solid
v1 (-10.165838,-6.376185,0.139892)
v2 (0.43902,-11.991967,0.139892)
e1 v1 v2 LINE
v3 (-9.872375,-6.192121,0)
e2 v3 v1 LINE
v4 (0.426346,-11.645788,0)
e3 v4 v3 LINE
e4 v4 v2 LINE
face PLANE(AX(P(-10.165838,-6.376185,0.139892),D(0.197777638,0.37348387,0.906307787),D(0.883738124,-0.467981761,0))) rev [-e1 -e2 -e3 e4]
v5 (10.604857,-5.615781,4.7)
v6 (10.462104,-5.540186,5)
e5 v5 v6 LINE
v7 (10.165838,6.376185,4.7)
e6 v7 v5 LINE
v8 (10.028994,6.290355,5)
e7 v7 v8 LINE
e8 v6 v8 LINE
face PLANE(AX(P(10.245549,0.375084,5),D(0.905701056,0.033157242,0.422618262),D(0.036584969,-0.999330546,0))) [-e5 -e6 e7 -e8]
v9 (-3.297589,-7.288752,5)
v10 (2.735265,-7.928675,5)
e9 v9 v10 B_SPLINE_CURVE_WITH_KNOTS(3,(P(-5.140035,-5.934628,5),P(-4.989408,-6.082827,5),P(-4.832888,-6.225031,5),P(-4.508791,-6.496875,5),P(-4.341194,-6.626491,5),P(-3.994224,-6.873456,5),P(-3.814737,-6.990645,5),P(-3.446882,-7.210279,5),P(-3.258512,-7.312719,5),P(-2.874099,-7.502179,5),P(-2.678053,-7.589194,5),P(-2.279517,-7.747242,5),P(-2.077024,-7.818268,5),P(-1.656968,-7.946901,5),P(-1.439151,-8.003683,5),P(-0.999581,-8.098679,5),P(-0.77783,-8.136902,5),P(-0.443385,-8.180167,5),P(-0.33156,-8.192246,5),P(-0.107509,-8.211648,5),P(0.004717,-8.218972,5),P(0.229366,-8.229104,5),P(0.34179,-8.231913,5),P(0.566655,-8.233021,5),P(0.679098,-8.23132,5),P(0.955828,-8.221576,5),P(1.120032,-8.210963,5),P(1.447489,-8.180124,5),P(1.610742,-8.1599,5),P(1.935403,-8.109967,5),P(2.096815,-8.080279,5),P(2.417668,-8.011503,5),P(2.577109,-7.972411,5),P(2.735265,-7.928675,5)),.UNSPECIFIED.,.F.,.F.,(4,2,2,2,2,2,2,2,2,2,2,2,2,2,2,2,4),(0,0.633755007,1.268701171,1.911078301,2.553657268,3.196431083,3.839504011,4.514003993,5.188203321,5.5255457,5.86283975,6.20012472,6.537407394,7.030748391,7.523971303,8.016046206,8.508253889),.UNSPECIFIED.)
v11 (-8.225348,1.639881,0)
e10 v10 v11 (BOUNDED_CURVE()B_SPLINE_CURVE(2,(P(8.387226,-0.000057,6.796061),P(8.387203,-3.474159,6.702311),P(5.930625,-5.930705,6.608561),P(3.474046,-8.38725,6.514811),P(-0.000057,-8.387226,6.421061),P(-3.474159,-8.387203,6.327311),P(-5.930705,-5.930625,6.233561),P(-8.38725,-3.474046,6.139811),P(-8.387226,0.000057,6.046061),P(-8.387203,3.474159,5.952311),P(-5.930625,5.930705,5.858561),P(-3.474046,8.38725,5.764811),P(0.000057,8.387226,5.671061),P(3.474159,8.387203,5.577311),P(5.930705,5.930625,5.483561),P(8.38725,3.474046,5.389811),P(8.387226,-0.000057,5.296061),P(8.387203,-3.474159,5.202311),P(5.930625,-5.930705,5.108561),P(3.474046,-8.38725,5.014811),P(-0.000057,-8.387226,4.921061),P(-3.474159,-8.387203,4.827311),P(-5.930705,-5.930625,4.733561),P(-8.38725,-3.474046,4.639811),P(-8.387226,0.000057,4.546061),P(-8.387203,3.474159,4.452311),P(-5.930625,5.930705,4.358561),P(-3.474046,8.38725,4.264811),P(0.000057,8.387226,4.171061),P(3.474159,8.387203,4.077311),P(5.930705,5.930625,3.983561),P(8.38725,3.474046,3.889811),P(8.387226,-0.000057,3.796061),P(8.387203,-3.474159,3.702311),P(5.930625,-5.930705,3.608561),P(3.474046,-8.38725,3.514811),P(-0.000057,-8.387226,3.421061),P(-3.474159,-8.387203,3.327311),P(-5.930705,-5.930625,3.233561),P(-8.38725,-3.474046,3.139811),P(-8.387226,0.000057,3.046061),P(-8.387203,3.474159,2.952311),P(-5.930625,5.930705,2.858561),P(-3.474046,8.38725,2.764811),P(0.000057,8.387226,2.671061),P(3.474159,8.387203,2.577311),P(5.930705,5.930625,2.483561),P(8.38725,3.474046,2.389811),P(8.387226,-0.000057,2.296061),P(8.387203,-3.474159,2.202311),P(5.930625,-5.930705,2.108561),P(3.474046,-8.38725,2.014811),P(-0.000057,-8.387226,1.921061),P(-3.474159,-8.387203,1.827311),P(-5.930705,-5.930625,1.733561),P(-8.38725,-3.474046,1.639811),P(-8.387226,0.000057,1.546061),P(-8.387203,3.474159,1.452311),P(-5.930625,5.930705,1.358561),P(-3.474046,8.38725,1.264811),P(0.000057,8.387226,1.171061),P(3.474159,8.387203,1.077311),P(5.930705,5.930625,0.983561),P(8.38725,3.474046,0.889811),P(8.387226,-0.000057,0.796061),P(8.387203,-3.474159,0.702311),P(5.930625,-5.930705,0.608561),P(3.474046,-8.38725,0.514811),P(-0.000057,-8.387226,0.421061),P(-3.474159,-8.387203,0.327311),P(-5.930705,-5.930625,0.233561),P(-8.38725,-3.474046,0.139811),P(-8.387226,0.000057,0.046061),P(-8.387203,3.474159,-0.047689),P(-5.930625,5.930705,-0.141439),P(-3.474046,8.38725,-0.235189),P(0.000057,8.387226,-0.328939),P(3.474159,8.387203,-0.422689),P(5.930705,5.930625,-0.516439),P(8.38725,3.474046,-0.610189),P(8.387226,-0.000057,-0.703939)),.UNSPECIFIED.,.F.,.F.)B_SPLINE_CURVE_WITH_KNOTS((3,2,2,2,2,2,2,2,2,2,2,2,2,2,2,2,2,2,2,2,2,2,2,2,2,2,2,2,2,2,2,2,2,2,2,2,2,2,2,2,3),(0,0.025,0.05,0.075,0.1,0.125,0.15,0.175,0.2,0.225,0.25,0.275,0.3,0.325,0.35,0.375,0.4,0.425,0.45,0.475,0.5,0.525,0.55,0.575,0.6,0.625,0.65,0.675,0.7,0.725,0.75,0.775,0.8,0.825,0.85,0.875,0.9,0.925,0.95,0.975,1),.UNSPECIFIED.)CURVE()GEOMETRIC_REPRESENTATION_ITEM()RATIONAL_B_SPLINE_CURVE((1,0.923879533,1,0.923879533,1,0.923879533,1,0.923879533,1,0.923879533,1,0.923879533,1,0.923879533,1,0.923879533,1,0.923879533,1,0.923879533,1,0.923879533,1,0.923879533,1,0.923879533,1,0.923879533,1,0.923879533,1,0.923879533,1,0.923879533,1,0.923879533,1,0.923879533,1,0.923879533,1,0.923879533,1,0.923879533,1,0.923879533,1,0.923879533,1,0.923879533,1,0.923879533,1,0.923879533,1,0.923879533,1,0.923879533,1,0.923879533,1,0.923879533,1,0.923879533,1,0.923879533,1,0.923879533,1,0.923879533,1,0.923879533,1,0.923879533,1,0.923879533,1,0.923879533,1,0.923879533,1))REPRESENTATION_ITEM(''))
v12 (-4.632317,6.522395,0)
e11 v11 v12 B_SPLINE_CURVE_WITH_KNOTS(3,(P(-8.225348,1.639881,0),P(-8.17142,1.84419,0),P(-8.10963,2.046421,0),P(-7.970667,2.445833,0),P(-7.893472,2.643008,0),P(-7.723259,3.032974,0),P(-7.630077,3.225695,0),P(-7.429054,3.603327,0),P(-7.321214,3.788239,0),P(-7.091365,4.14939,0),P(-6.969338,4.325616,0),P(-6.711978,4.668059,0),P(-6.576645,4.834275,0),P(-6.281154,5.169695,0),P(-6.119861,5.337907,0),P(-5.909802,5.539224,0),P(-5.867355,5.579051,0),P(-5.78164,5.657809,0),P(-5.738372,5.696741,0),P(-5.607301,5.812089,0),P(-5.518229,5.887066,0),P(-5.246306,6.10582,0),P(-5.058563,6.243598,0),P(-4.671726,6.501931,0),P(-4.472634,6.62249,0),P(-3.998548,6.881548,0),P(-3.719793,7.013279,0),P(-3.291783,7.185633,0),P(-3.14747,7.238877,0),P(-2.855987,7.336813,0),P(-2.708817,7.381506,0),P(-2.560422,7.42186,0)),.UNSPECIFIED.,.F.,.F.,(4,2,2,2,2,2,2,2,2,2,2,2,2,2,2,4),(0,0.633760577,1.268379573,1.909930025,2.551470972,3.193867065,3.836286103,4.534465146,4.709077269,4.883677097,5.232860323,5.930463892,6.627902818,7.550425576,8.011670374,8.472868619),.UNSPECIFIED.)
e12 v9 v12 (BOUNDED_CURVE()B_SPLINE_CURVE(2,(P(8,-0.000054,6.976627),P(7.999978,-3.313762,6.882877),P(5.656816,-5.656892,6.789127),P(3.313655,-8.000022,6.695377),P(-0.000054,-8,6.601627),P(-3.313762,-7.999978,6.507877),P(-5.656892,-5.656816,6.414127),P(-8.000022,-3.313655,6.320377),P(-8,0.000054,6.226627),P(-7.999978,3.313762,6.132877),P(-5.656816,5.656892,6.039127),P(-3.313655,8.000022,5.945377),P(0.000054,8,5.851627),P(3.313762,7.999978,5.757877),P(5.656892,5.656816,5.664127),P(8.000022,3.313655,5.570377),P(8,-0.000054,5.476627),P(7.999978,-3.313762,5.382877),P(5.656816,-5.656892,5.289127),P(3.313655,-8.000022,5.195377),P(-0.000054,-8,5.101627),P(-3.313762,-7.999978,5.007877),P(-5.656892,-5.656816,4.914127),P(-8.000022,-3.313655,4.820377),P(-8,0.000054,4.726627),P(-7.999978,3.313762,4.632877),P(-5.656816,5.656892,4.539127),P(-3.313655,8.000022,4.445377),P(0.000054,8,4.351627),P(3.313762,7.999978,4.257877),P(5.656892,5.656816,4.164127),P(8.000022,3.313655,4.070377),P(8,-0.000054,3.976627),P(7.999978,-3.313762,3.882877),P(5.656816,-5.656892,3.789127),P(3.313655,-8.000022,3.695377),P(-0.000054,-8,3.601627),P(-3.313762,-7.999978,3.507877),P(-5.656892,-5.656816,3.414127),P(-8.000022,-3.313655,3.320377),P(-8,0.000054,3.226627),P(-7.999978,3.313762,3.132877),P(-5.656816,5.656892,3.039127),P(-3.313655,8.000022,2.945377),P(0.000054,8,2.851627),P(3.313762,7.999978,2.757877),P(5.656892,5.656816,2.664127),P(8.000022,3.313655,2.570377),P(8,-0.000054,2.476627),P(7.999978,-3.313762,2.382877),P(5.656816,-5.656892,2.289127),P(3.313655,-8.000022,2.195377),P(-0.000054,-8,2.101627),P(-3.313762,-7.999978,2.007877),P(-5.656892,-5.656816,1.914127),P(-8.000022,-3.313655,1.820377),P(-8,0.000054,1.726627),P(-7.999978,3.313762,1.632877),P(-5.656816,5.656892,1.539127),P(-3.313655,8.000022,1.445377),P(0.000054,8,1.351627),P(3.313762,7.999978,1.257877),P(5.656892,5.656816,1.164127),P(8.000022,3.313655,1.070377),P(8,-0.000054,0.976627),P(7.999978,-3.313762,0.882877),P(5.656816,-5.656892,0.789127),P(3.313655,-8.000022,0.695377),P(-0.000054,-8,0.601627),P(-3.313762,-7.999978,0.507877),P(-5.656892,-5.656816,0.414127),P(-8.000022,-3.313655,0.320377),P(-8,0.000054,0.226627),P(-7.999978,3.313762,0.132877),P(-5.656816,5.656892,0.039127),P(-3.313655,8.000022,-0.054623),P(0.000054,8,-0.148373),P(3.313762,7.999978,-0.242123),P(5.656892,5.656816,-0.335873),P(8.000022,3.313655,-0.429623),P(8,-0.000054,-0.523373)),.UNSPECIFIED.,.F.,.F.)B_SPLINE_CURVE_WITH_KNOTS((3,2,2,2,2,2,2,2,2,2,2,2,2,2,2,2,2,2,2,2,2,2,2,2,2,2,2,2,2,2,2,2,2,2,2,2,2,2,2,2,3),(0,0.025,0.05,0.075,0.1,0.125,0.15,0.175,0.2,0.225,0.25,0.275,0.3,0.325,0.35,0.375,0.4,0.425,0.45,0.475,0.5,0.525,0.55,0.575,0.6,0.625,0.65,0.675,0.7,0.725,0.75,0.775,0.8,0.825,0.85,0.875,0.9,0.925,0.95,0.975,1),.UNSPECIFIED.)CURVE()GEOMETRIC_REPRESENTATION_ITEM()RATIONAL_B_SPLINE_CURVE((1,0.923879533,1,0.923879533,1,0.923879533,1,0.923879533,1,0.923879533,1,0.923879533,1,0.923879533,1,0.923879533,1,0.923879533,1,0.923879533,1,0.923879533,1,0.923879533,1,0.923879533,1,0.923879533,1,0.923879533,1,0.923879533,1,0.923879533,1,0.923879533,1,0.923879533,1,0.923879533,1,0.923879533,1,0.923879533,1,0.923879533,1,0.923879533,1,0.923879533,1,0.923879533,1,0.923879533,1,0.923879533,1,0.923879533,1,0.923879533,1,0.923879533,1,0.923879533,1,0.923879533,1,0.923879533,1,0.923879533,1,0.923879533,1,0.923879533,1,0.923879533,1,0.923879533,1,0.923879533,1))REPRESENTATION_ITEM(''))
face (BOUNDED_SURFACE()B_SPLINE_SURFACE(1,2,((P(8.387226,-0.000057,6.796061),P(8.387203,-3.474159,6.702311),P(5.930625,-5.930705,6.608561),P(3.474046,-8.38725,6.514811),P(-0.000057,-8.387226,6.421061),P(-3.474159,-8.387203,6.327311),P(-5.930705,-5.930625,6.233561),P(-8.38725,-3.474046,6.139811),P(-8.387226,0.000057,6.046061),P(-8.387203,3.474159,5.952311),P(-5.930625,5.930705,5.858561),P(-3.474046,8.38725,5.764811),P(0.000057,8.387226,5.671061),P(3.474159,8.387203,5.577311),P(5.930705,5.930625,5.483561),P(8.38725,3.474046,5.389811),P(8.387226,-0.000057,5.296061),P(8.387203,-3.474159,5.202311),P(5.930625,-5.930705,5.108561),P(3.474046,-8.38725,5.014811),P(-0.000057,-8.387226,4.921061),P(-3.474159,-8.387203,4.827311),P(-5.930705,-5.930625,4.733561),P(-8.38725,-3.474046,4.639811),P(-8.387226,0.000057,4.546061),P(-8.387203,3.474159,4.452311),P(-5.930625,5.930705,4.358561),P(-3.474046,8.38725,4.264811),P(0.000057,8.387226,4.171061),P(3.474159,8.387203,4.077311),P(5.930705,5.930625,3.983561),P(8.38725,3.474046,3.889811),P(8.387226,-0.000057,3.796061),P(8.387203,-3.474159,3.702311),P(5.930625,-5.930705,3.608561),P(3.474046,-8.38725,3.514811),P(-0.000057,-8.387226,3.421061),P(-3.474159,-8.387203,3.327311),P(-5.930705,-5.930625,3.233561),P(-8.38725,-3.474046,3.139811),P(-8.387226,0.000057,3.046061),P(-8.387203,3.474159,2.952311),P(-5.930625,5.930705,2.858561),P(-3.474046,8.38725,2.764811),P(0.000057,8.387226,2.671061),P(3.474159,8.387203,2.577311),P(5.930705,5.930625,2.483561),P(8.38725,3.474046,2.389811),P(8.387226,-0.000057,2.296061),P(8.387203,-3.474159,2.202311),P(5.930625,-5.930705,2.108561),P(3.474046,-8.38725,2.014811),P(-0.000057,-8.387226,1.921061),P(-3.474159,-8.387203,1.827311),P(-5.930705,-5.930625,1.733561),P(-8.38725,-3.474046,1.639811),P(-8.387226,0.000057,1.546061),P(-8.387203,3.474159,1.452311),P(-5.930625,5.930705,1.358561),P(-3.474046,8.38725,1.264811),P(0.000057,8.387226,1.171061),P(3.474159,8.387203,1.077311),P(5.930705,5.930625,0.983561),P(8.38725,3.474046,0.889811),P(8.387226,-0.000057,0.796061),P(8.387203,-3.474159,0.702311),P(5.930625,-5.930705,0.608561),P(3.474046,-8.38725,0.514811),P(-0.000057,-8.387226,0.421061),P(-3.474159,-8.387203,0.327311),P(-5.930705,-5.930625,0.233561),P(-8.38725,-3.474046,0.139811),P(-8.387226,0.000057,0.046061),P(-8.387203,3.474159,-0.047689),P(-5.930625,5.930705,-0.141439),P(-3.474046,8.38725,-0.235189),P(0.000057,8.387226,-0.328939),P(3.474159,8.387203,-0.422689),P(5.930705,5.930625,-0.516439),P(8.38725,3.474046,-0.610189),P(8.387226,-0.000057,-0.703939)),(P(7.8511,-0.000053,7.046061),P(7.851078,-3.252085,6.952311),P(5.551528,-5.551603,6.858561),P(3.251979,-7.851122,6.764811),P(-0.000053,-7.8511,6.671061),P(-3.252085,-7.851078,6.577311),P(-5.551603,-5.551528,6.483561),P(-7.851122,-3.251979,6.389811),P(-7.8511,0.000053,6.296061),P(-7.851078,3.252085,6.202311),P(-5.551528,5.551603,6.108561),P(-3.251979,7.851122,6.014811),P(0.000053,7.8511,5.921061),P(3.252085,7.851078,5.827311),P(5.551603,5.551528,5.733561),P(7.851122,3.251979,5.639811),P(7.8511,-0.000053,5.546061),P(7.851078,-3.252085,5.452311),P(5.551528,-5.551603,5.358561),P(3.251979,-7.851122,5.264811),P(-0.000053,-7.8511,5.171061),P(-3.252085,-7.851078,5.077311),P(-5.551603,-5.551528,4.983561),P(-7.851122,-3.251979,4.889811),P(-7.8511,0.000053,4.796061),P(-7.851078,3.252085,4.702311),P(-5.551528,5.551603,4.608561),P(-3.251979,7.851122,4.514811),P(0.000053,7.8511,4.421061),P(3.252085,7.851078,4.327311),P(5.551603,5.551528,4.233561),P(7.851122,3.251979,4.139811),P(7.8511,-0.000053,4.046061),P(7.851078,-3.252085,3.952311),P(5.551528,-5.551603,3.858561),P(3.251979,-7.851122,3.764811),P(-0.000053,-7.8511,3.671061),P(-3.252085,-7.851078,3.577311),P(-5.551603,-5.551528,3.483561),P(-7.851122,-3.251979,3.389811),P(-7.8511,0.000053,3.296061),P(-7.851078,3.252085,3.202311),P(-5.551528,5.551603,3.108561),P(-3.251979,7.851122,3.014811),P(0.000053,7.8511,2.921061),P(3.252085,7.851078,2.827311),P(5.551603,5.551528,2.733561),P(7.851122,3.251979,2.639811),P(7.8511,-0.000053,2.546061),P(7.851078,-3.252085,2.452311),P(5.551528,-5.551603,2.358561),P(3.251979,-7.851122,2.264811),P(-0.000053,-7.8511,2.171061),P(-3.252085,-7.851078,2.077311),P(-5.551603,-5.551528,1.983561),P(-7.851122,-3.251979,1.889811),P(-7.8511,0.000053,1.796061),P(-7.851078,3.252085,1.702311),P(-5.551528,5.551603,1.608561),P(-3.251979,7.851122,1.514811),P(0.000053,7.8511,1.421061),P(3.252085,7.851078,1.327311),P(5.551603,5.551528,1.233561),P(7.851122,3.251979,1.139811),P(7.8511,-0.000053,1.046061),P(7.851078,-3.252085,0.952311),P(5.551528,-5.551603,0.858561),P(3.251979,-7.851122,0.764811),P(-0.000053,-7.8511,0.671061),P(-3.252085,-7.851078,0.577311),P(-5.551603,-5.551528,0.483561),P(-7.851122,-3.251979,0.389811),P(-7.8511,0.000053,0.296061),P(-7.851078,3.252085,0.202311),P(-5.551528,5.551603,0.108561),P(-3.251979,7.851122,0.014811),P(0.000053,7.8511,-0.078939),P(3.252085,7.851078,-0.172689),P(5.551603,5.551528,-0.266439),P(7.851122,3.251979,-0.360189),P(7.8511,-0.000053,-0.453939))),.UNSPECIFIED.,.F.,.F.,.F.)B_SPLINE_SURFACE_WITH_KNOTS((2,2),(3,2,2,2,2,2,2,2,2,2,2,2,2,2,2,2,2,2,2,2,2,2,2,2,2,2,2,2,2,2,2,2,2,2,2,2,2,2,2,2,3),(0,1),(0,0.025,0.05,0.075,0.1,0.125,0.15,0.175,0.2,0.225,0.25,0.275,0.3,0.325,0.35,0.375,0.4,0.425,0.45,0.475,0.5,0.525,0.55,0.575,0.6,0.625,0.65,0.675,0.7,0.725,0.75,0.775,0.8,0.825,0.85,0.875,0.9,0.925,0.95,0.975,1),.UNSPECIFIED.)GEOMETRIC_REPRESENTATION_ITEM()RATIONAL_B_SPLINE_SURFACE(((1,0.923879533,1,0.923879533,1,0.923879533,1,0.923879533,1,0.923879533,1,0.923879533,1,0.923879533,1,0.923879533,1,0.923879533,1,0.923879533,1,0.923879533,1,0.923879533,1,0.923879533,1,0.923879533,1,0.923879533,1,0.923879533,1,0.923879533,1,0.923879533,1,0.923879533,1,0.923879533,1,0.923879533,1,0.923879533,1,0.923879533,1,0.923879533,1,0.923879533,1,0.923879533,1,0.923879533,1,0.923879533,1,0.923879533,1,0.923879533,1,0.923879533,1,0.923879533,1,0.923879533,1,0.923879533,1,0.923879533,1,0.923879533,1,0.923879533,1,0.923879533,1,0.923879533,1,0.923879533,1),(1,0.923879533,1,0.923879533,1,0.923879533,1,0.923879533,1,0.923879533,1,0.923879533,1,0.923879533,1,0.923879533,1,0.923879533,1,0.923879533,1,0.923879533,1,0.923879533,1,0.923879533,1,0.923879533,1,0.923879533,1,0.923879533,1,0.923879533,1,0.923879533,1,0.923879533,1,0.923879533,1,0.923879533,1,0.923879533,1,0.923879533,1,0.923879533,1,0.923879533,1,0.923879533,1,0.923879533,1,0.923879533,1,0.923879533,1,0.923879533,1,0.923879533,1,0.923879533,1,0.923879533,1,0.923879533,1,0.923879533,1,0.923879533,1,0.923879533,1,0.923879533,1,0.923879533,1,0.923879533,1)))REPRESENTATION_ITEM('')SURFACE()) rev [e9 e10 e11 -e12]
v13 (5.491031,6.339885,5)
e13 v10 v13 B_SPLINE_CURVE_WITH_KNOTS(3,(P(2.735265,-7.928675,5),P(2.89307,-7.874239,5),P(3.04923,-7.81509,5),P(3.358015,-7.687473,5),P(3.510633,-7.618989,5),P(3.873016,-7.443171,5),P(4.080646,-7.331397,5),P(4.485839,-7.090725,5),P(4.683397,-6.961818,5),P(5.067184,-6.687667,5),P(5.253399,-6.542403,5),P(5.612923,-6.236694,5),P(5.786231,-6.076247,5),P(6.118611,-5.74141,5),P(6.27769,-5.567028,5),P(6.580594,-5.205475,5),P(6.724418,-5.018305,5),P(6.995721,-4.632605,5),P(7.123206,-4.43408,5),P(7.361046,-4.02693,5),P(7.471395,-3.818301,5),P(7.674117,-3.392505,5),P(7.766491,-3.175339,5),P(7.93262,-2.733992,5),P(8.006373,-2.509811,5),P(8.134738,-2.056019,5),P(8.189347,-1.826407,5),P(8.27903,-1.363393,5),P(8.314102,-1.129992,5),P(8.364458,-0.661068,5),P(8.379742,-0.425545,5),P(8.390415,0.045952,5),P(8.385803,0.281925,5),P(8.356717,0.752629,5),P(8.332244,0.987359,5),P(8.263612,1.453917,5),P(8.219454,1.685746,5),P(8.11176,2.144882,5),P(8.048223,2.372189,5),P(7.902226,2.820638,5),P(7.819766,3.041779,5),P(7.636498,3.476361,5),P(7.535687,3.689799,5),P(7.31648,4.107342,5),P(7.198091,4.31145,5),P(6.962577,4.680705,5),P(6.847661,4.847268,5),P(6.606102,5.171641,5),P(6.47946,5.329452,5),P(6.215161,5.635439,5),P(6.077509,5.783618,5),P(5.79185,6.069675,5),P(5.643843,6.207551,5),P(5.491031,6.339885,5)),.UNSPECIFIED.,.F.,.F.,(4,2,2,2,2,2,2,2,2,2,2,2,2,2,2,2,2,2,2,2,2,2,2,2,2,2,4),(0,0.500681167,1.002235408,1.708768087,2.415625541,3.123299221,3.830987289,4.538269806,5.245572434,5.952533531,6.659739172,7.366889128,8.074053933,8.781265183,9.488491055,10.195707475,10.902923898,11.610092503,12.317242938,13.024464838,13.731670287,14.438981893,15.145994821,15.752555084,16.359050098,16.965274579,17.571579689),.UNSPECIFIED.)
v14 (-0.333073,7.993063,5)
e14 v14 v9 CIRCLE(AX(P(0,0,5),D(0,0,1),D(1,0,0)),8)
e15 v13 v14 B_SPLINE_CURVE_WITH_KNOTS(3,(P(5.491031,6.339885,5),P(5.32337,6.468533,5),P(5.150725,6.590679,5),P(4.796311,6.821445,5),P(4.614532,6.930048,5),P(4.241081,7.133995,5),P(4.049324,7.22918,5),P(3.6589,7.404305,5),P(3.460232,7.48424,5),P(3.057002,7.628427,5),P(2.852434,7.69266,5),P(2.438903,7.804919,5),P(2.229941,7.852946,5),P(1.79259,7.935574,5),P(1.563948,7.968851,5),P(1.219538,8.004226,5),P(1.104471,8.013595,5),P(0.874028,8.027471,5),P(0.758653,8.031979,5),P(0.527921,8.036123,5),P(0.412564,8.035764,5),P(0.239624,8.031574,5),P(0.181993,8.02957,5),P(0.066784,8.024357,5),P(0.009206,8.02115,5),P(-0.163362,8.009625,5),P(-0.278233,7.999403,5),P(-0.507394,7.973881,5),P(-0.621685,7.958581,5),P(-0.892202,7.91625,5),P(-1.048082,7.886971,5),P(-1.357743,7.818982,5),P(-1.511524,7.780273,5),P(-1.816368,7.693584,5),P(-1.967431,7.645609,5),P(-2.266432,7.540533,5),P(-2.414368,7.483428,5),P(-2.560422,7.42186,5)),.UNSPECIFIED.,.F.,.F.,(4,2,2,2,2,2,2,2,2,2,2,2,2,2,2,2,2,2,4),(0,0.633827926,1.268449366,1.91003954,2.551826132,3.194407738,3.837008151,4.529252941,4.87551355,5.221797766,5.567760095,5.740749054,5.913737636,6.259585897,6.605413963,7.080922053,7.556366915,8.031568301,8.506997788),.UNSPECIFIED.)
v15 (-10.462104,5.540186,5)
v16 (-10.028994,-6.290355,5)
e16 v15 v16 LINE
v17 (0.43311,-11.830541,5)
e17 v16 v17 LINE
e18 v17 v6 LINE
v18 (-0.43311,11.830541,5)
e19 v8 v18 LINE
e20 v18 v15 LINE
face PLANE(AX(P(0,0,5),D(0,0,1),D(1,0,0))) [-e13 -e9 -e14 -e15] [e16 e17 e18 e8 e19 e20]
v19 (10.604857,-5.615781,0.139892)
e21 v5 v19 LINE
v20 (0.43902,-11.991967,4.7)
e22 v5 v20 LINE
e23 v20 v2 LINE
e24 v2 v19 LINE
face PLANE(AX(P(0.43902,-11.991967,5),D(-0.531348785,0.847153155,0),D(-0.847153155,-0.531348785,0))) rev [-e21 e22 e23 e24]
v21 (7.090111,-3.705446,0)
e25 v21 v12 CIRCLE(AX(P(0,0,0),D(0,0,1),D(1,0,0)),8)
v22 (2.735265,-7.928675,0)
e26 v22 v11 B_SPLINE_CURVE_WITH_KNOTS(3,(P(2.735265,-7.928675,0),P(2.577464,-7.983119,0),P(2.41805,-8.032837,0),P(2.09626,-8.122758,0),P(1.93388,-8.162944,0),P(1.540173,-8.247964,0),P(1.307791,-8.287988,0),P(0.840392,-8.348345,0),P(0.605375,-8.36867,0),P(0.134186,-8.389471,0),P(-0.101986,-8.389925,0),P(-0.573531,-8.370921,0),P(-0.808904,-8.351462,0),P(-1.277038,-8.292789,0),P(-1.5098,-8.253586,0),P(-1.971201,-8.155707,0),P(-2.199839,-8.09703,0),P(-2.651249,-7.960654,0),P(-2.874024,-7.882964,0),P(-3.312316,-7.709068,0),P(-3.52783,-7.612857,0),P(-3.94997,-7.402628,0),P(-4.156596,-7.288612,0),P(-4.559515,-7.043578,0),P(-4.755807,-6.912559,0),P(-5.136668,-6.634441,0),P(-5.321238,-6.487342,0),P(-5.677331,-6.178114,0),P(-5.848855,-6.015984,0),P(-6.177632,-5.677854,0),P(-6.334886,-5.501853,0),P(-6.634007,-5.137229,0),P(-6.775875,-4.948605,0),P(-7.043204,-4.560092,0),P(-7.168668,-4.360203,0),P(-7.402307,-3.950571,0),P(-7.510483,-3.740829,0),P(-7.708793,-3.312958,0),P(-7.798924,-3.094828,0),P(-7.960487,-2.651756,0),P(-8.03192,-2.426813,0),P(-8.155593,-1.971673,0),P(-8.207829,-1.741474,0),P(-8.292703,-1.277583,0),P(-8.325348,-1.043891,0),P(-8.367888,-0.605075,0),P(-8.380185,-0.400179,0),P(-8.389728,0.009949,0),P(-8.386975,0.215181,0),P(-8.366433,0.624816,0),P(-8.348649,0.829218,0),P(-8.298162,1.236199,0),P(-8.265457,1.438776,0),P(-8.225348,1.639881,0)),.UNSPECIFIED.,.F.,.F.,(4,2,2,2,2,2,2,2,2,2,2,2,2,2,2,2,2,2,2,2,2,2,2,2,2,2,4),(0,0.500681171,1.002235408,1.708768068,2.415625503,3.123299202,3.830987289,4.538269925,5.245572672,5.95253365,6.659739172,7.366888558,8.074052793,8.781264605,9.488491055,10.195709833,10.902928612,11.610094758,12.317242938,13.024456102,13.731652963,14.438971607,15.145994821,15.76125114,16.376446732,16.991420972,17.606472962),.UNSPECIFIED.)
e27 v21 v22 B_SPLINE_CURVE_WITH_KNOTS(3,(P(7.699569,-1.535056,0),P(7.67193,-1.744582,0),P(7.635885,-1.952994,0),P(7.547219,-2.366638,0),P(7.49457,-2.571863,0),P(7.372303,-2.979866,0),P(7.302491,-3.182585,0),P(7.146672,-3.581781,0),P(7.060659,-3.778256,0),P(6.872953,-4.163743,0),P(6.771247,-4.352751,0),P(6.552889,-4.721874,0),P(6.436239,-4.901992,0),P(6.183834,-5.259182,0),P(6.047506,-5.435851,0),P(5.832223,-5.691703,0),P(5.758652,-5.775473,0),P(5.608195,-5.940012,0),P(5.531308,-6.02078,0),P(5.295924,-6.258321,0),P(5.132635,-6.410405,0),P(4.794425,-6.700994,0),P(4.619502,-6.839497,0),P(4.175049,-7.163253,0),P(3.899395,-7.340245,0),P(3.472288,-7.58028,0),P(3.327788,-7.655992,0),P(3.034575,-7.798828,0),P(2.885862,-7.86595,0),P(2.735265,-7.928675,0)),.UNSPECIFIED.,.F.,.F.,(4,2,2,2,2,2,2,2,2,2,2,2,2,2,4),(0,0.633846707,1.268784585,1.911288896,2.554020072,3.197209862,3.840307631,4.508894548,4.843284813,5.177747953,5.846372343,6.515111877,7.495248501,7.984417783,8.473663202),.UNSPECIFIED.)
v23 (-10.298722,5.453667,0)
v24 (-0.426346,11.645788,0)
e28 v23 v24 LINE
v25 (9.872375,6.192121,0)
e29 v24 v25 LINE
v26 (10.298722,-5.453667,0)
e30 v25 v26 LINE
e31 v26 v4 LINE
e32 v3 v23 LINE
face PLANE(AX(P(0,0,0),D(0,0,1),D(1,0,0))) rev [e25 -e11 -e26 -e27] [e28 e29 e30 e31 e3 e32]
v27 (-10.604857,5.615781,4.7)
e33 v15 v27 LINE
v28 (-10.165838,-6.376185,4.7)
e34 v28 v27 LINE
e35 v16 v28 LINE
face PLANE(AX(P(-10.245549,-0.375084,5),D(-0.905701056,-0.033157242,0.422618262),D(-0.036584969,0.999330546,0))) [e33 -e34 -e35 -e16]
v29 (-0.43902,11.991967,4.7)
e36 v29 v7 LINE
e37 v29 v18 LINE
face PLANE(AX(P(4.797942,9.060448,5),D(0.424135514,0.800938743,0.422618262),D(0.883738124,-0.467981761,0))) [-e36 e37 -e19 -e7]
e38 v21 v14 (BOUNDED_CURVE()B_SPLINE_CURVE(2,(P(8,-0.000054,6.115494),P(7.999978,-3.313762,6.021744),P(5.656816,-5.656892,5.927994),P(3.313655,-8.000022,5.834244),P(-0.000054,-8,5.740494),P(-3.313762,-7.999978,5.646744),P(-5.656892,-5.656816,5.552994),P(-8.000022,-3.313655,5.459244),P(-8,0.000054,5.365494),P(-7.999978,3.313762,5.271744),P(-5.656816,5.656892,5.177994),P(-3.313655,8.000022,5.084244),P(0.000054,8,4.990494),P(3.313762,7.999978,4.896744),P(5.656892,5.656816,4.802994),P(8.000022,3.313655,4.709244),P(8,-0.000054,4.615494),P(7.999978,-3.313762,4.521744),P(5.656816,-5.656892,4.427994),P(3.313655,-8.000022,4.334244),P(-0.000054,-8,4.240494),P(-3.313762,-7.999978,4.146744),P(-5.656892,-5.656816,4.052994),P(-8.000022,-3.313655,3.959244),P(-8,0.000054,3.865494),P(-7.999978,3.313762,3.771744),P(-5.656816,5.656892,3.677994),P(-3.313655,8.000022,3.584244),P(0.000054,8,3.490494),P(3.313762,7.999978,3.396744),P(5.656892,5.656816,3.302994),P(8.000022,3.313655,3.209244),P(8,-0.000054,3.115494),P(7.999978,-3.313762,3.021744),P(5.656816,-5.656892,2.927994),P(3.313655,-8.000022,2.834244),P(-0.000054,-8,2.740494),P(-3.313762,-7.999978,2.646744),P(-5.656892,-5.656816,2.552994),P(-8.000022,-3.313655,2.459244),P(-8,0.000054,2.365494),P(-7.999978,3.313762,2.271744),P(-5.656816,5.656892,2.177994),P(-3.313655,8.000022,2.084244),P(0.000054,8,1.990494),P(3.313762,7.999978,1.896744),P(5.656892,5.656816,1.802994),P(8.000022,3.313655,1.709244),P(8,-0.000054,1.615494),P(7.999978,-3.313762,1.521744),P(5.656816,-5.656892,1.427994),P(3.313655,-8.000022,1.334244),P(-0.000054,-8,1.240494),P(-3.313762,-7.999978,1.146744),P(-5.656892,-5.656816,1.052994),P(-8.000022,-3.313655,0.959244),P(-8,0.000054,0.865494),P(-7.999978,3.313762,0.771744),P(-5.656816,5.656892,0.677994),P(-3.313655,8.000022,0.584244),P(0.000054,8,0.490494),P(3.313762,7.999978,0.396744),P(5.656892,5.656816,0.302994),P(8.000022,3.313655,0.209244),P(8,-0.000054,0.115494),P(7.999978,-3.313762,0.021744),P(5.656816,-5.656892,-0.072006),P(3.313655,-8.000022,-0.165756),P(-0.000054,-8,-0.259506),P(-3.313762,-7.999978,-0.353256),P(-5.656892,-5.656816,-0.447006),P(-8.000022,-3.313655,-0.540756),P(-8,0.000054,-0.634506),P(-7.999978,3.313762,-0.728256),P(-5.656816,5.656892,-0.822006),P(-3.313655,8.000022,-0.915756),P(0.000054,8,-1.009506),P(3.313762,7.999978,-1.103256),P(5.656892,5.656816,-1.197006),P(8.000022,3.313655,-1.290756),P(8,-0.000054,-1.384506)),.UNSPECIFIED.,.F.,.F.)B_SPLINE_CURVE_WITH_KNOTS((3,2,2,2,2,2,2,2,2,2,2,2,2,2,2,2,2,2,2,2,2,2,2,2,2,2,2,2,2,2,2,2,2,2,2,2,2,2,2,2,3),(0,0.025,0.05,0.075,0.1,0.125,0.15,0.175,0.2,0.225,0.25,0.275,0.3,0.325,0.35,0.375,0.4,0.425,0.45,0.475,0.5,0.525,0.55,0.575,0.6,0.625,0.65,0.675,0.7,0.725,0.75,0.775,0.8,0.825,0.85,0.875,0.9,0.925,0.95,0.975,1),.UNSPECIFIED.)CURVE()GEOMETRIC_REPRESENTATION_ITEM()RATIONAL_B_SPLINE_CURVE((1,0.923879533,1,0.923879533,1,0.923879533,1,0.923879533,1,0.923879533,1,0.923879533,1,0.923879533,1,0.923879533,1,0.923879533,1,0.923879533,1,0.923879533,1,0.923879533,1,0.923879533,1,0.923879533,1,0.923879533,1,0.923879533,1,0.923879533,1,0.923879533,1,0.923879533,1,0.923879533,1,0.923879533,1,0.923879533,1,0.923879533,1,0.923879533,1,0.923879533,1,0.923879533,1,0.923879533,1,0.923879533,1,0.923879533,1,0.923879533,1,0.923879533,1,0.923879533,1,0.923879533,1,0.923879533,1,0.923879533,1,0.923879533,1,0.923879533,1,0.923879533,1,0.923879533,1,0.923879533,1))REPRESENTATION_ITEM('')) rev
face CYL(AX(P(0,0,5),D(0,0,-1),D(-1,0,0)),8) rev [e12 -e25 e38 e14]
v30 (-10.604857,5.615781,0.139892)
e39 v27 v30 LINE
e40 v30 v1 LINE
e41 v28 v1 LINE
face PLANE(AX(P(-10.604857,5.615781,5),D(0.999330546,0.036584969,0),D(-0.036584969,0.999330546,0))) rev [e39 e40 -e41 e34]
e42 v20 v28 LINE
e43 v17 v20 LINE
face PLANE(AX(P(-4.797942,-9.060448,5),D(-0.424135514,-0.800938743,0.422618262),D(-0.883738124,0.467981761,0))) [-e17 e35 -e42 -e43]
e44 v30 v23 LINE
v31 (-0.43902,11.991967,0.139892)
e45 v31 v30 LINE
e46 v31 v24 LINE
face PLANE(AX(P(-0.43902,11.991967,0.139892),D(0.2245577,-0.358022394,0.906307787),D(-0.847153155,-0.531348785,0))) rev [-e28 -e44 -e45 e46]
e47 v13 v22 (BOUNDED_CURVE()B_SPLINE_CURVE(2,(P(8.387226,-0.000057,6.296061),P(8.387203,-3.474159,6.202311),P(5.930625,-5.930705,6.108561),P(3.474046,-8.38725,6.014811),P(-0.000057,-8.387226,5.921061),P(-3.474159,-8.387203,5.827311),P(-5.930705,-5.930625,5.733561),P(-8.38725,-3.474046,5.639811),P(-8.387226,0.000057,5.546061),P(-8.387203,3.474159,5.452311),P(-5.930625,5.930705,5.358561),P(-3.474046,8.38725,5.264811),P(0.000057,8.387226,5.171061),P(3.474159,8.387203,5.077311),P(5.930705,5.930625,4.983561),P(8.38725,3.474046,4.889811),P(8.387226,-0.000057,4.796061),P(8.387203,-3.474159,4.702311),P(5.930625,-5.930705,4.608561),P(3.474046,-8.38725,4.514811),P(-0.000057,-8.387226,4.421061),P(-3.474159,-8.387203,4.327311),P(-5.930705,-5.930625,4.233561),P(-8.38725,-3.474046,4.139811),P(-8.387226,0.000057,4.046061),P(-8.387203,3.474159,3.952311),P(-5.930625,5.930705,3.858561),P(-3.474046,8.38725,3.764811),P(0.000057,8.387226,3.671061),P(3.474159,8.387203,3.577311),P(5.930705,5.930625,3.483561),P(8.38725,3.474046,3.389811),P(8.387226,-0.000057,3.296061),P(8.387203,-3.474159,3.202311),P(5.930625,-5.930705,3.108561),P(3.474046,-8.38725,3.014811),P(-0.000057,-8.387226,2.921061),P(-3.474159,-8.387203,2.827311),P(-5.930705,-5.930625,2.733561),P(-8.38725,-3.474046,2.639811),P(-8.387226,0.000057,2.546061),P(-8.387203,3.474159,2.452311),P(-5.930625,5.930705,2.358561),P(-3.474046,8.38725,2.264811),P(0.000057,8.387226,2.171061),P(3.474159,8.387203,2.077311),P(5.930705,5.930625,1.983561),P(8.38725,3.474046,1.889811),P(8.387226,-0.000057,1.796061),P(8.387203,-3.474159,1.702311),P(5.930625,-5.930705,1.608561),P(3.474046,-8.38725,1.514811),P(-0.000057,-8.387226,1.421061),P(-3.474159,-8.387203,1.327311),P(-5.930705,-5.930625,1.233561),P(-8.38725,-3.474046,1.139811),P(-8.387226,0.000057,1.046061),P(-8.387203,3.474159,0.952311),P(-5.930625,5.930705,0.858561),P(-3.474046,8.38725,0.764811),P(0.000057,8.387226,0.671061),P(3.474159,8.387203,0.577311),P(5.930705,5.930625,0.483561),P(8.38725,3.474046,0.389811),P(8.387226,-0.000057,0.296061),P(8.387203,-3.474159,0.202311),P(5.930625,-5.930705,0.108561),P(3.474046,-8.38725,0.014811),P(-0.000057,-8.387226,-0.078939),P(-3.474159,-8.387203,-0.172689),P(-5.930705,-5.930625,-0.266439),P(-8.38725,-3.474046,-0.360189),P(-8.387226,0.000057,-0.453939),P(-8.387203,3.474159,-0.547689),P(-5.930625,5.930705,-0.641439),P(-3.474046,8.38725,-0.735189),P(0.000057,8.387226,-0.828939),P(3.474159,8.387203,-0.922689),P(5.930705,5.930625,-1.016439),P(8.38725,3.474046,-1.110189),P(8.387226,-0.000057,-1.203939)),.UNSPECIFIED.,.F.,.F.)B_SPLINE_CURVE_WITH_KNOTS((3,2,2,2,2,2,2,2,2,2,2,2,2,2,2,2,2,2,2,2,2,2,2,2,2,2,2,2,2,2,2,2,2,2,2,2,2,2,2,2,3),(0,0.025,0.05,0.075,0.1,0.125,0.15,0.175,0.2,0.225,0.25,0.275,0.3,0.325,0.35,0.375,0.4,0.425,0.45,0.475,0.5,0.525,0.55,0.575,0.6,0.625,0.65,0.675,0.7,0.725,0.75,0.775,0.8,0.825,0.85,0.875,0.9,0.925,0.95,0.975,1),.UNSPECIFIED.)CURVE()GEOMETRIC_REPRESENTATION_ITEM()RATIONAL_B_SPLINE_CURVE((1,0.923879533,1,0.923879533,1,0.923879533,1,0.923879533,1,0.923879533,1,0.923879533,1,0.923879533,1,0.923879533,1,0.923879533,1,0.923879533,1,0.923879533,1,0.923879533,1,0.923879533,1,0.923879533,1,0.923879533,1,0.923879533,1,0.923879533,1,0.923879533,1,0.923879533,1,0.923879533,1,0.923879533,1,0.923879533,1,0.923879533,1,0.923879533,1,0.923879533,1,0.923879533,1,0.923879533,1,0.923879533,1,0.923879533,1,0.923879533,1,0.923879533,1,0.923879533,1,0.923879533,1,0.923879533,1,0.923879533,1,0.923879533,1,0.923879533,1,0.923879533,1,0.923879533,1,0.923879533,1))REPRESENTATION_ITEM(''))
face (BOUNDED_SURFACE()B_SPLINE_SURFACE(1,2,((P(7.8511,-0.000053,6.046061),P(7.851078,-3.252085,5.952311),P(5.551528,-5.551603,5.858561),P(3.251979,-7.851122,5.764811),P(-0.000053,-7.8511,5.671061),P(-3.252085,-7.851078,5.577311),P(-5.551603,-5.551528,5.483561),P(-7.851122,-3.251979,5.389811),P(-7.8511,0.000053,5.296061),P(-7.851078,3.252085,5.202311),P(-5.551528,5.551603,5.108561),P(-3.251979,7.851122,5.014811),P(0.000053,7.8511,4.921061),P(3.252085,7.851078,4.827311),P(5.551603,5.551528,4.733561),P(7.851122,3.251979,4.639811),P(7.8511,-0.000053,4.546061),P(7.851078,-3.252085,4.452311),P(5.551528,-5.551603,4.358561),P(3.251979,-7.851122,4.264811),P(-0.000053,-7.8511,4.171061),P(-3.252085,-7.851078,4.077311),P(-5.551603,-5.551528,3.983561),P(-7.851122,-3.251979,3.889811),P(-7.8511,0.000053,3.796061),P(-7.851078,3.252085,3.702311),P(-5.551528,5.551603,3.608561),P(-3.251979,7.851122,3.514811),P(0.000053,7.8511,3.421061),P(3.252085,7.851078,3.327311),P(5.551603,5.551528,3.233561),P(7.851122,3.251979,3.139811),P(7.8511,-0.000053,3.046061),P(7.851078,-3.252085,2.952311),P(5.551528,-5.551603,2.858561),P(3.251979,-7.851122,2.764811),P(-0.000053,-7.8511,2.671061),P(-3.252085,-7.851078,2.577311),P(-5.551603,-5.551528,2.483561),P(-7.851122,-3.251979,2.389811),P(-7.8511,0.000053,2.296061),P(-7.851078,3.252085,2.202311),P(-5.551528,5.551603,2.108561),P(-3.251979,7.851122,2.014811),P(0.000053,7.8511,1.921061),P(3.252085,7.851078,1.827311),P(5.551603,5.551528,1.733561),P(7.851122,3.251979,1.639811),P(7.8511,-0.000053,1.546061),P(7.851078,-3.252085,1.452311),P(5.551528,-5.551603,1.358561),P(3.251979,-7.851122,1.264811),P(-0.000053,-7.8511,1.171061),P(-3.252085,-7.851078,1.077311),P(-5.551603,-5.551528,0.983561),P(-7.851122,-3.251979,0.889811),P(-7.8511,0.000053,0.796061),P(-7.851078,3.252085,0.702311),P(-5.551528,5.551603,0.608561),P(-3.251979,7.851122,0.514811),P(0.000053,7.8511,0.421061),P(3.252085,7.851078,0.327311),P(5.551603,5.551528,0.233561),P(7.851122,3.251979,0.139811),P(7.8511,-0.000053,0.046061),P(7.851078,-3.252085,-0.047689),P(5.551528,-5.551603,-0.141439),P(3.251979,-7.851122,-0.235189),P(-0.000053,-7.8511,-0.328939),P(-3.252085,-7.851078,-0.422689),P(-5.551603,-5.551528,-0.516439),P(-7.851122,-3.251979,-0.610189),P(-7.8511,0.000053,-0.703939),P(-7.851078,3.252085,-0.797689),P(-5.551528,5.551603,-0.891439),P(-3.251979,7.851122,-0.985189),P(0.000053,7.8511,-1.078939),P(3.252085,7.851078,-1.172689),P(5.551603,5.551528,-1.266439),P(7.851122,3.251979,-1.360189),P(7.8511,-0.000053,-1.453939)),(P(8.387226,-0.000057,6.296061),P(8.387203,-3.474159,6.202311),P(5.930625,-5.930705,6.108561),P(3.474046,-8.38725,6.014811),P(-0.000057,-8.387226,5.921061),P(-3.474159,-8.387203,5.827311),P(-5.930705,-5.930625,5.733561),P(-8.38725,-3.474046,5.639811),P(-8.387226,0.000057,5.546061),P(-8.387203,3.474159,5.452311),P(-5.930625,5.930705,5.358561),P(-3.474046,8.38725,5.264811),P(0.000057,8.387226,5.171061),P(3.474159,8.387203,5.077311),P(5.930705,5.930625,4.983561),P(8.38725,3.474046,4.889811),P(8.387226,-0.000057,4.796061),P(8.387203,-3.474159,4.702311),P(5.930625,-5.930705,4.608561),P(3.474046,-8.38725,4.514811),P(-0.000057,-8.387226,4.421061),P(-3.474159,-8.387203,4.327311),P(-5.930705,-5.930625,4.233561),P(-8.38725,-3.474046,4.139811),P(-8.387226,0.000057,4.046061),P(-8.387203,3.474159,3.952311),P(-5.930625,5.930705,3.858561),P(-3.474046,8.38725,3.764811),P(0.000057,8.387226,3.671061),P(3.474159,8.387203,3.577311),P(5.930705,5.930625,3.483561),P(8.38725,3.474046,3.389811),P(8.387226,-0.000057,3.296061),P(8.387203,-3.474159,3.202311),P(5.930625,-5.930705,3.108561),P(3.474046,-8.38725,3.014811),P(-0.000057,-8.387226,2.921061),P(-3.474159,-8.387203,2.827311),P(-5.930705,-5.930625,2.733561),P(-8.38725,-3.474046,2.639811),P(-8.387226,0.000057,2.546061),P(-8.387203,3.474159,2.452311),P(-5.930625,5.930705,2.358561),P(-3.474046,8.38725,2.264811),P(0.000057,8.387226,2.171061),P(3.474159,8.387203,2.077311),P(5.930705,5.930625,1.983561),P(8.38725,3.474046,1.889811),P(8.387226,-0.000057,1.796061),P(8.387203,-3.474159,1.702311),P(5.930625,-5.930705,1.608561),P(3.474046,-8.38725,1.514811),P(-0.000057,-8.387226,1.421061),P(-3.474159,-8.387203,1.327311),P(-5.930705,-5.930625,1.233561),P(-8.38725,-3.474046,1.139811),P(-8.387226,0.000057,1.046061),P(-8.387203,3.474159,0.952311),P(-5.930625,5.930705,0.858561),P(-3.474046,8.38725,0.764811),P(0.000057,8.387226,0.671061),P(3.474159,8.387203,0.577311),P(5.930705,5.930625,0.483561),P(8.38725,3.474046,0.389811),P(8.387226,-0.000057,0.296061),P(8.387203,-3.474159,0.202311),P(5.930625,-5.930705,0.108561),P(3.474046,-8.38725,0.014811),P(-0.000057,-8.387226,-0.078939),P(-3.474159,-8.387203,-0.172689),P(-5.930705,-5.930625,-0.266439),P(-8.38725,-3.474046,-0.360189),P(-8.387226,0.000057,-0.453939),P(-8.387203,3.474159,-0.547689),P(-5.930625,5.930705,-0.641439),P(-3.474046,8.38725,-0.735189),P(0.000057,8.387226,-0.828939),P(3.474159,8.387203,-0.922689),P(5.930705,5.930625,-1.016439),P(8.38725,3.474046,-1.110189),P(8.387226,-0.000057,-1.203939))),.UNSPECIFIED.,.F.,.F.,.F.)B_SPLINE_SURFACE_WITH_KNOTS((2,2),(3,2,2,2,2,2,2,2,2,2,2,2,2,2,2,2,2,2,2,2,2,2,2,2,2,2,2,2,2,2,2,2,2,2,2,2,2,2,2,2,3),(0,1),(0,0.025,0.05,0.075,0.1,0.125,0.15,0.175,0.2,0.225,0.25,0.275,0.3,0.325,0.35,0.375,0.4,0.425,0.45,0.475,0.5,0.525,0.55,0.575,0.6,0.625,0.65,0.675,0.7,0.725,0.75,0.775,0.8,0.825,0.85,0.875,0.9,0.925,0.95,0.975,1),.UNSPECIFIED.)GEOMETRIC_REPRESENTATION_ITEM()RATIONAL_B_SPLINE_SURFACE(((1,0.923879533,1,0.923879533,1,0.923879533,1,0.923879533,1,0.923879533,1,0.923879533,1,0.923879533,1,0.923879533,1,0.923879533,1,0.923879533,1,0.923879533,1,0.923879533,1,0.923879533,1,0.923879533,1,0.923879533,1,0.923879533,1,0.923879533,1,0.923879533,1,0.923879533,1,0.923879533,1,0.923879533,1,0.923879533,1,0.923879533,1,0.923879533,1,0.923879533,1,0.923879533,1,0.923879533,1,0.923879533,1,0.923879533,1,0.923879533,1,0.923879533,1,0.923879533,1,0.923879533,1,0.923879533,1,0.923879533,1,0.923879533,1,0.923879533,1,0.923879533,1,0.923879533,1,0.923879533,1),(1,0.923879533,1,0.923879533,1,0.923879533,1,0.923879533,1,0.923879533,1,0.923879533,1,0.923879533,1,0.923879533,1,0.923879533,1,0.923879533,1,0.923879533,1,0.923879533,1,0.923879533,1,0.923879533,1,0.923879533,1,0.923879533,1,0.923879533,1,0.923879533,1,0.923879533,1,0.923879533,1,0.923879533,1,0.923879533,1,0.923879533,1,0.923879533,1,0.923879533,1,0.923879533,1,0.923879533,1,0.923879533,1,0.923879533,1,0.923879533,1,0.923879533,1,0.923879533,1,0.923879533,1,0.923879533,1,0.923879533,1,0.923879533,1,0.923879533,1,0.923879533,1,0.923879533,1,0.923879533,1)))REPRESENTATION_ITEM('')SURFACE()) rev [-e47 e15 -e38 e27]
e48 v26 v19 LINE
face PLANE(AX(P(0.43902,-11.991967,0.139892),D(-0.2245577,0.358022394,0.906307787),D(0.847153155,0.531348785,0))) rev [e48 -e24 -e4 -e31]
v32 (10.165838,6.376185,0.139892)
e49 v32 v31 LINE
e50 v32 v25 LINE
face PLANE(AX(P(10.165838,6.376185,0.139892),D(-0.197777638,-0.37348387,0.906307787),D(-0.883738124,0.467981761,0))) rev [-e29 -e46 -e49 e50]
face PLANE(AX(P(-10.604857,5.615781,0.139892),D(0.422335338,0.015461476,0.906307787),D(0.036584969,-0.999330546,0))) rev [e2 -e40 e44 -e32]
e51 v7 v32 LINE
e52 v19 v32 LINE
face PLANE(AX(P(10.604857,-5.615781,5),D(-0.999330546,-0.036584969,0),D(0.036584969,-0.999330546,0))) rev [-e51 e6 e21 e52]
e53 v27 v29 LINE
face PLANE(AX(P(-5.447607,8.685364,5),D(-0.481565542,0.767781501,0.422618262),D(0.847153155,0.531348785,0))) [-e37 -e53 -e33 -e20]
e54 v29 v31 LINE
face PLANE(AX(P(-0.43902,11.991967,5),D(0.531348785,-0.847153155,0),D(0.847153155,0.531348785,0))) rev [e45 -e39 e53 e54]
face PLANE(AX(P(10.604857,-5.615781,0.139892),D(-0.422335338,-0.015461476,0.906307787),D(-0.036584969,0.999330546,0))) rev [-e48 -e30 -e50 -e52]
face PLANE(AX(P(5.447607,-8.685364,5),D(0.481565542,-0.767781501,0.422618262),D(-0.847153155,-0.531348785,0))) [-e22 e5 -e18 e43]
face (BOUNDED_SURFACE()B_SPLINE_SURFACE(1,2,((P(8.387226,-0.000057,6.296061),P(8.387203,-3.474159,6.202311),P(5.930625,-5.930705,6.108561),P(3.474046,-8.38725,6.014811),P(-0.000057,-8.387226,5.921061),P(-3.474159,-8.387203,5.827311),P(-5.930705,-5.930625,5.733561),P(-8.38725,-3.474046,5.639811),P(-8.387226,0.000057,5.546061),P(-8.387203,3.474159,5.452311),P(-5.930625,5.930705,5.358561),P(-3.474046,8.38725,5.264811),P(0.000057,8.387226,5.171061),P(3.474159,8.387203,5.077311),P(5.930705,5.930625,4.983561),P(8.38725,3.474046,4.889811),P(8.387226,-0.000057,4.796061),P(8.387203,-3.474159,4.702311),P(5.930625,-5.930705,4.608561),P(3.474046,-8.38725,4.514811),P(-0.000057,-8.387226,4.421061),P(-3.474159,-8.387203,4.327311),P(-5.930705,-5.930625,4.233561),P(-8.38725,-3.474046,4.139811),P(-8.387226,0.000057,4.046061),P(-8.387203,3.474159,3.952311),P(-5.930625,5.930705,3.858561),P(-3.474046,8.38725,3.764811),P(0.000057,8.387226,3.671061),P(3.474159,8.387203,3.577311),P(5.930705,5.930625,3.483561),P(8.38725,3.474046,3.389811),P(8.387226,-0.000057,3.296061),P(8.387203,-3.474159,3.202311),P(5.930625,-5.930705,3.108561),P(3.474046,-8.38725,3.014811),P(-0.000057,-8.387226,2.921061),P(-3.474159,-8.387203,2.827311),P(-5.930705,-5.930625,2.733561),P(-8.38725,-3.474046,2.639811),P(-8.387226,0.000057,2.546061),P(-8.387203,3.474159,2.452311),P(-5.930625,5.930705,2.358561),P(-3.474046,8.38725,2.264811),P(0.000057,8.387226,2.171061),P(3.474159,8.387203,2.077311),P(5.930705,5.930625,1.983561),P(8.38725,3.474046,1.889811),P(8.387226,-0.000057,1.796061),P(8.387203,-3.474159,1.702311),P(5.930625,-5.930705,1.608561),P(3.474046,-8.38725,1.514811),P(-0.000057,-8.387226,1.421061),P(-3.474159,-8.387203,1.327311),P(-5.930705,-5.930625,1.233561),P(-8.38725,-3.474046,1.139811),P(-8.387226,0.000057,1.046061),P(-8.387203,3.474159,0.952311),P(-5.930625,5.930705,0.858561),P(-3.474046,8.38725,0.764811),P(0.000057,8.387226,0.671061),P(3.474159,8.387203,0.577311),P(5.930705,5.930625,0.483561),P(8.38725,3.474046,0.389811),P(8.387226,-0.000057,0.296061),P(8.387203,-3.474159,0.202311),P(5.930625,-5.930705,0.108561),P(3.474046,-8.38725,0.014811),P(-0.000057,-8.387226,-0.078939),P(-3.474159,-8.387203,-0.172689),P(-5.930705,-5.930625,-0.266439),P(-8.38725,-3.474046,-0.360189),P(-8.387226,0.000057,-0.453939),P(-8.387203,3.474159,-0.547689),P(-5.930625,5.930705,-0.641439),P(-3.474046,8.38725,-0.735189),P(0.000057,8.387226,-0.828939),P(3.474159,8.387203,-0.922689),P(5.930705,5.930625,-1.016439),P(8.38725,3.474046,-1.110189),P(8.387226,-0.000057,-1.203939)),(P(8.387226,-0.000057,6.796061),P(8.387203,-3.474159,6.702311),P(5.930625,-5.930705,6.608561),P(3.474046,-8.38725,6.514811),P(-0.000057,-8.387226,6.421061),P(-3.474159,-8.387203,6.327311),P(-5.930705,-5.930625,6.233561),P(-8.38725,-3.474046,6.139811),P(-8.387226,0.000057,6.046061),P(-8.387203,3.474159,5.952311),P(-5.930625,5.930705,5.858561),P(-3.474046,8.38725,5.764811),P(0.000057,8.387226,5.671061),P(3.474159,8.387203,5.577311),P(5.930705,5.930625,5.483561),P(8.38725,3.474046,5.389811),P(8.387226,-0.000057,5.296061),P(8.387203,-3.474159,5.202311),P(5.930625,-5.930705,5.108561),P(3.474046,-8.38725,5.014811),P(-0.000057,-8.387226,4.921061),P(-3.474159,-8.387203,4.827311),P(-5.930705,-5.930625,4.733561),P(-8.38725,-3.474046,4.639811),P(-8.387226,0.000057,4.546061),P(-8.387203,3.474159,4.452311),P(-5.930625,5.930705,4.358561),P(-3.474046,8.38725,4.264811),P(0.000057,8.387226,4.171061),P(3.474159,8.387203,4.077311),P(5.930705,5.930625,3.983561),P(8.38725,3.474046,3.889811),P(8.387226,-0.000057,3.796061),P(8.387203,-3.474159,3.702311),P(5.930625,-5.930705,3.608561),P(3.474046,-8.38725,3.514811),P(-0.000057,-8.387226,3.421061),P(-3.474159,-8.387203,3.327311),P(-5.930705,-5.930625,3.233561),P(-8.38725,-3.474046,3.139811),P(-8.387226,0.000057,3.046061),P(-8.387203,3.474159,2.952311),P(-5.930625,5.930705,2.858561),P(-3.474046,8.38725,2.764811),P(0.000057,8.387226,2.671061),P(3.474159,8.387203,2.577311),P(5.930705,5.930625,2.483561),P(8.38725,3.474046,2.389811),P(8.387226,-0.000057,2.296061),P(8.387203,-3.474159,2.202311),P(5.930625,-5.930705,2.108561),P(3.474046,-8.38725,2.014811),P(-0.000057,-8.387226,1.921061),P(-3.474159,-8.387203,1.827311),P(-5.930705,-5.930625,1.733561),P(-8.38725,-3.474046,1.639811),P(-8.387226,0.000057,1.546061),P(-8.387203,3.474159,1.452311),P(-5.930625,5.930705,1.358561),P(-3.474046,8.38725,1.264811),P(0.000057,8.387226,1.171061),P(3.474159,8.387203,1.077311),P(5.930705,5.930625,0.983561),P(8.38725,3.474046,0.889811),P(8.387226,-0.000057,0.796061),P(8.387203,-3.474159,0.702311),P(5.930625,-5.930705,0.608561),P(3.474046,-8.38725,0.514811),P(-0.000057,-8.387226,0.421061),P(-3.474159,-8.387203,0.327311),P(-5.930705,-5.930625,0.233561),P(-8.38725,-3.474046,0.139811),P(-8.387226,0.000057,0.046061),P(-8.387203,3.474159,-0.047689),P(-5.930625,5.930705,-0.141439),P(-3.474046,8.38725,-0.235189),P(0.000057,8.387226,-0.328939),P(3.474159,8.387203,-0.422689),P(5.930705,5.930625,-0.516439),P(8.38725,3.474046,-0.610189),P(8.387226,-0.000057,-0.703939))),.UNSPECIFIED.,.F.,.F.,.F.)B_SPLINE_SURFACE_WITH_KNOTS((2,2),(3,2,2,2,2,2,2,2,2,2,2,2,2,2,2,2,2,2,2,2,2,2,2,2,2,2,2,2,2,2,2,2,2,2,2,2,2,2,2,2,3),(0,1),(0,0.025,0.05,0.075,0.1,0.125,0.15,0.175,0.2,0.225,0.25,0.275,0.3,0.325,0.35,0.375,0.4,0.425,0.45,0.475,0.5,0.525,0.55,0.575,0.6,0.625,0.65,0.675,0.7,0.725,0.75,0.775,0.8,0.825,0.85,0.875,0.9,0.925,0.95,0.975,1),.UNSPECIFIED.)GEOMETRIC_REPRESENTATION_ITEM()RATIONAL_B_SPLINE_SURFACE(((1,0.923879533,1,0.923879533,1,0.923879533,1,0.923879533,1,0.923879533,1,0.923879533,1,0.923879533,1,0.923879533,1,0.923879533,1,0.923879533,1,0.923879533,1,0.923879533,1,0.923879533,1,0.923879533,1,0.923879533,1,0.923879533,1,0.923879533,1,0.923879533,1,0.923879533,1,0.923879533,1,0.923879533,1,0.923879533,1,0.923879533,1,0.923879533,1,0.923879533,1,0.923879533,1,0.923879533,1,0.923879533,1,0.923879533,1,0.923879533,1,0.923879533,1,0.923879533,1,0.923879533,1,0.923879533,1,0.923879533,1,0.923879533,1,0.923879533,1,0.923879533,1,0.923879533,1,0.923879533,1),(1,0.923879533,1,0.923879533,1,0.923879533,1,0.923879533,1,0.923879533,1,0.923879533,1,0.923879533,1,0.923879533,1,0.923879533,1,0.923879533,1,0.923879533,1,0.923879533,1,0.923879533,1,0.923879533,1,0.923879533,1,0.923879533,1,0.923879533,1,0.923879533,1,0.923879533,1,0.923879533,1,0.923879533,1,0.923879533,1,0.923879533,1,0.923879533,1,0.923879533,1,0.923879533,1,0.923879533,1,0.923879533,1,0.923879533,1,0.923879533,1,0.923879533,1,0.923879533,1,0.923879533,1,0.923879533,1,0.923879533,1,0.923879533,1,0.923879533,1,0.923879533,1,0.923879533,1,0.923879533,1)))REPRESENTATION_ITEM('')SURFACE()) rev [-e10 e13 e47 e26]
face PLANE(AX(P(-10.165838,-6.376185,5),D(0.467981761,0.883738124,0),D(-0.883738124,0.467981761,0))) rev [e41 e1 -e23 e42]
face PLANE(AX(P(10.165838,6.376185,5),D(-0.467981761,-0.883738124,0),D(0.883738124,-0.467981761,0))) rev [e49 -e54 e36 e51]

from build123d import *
from OCP.BRepFilletAPI import BRepFilletAPI_MakeChamfer

# Parameters (mm, degrees)
SKETCH1_R           = 8
BOSS_EXTRUDE1_DEPTH = 5
CUT_SWEEP1_PITCH    = 1.5
CHAMFER1_SIZE       = 0.3
CHAMFER1_SIZE2      = 0.139892297


with BuildPart() as part:
    # Sketch1 → Boss-Extrude1 (new body)
    with BuildSketch(Plane.XY):
        Polygon((10.165837862, 6.376185425), (-0.439019626, 11.991966551), (-10.604857488, 5.615781126), (-10.165837862, -6.376185425), (0.439019626, -11.991966551), (10.604857488, -5.615781126), align=None)
        Circle(SKETCH1_R, mode=Mode.SUBTRACT)
    extrude(amount=BOSS_EXTRUDE1_DEPTH)

    # Cut-Sweep1: arcs per turn and ends read off the stored shape
    # Cut-Sweep1: the profile of Sketch3 screwed along a right-hand helix through 5 turns, 8 arcs to a turn; built about Z, then put on its axis
    cut_sweep1_z = Axis((0, 0, 0), (0, 0, 1))
    cut_sweep1_corners = [(7.851099618, 5.3441e-05, -1.046060596), (7.851099618, 5.3441e-05, -2.046060596), (8.387226348, 5.709e-05, -1.796060596), (8.387226348, 5.709e-05, -1.296060596)]
    with BuildLine(mode=Mode.PRIVATE) as cut_sweep1_profile:
        Line(cut_sweep1_corners[0], cut_sweep1_corners[1])
        Line(cut_sweep1_corners[1], cut_sweep1_corners[2])
        Line(cut_sweep1_corners[2], cut_sweep1_corners[3])
        Line(cut_sweep1_corners[3], cut_sweep1_corners[0])
    cut_sweep1_cap = Face(cut_sweep1_profile.wire())
    cut_sweep1_turn_angles = [0, 22.5, 45, 67.5, 90, 112.5, 135, 157.5, 180, 202.5, 225, 247.5, 270, 292.5, 315, 337.5, 360]
    cut_sweep1_turn_weights = [1, 0.9238795325112867, 1, 0.9238795325112867, 1, 0.9238795325112867, 1, 0.9238795325112867, 1, 0.9238795325112867, 1, 0.9238795325112867, 1, 0.9238795325112867, 1, 0.9238795325112867, 1]
    cut_sweep1_turn_rails = [Edge.make_bspline([Vector(p[0], p[1], 0).rotate(cut_sweep1_z, cut_sweep1_turn_angles[k]) / cut_sweep1_turn_weights[k] + Vector(0, 0, p[2] + CUT_SWEEP1_PITCH * cut_sweep1_turn_angles[k] / 360) for k in range(17)], [0, 0, 0, 1, 1, 2, 2, 3, 3, 4, 4, 5, 5, 6, 6, 7, 7, 8, 8, 8], 2, cut_sweep1_turn_weights) for p in cut_sweep1_corners]
    cut_sweep1_turn_sides = [Face.make_surface_from_curves(cut_sweep1_turn_rails[p[0]], cut_sweep1_turn_rails[p[1]]) for p in [(0, 1), (1, 2), (2, 3), (3, 0)]]
    cut_sweep1 = Plane(origin=(0, 0, 5), x_dir=(1, 0, 0), z_dir=(0, 0, -1)) * Solid(Shell([*[p.moved(Location((0, 0, CUT_SWEEP1_PITCH * i))) for i in range(5) for p in cut_sweep1_turn_sides], cut_sweep1_cap, cut_sweep1_cap.rotate(cut_sweep1_z, 1800).moved(Location((0, 0, CUT_SWEEP1_PITCH * 1800 / 360)))]))
    add(cut_sweep1, mode=Mode.SUBTRACT)

    # Chamfer1: one chamfer whose edges measure the first distance from different faces: ONE call of the kernel's chamfer builder (chamfer() names one face for all edges)
    chamfer1_edges_1 = [part.edges().sort_by_distance(p)[0] for p in [
        (-5.521938557, 8.803873839, 5),
    ]]
    chamfer1_side_1 = [part.faces().sort_by_distance(p)[0] for p in [
        (-5.521938557, 8.803873839, 2.5),
    ]]
    chamfer1_edges_2 = [part.edges().sort_by_distance(p)[0] for p in [
        (-10.385347675, -0.380202149, 5),
    ]]
    chamfer1_side_2 = [part.faces().sort_by_distance(p)[0] for p in [
        (-10.385347675, -0.380202149, 2.5),
    ]]
    chamfer1_edges_3 = [part.edges().sort_by_distance(p)[0] for p in [
        (-4.863409118, -9.184075988, 5),
    ]]
    chamfer1_side_3 = [part.faces().sort_by_distance(p)[0] for p in [
        (-4.863409118, -9.184075988, 2.5),
    ]]
    chamfer1_edges_4 = [part.edges().sort_by_distance(p)[0] for p in [
        (5.521938557, -8.803873839, 5),
    ]]
    chamfer1_side_4 = [part.faces().sort_by_distance(p)[0] for p in [
        (5.521938557, -8.803873839, 2.5),
    ]]
    chamfer1_edges_5 = [part.edges().sort_by_distance(p)[0] for p in [
        (10.385347675, 0.380202149, 5),
    ]]
    chamfer1_side_5 = [part.faces().sort_by_distance(p)[0] for p in [
        (10.385347675, 0.380202149, 2.5),
    ]]
    chamfer1_edges_6 = [part.edges().sort_by_distance(p)[0] for p in [
        (5.521938557, -8.803873839, 0),
        (-4.863409118, -9.184075988, 0),
        (-10.385347675, -0.380202149, 0),
        (-5.521938557, 8.803873839, 0),
        (4.863409118, 9.184075988, 0),
        (10.385347675, 0.380202149, 0),
    ]]
    chamfer1_side_6 = [part.faces().sort_by_distance(p)[0] for p in [
        (4.713575925, 8.901130549, 0),
    ]]
    chamfer1_edges_7 = [part.edges().sort_by_distance(p)[0] for p in [
        (4.863409118, 9.184075988, 5),
    ]]
    chamfer1_side_7 = [part.faces().sort_by_distance(p)[0] for p in [
        (4.863409118, 9.184075988, 2.5),
    ]]
    chamfer1 = BRepFilletAPI_MakeChamfer(part.part.solid().wrapped)
    for e in chamfer1_edges_1:
        chamfer1.Add(CHAMFER1_SIZE, CHAMFER1_SIZE2, e.wrapped, chamfer1_side_1[0].wrapped)  # the first distance lies on this face
    for e in chamfer1_edges_2:
        chamfer1.Add(CHAMFER1_SIZE, CHAMFER1_SIZE2, e.wrapped, chamfer1_side_2[0].wrapped)  # the first distance lies on this face
    for e in chamfer1_edges_3:
        chamfer1.Add(CHAMFER1_SIZE, CHAMFER1_SIZE2, e.wrapped, chamfer1_side_3[0].wrapped)  # the first distance lies on this face
    for e in chamfer1_edges_4:
        chamfer1.Add(CHAMFER1_SIZE, CHAMFER1_SIZE2, e.wrapped, chamfer1_side_4[0].wrapped)  # the first distance lies on this face
    for e in chamfer1_edges_5:
        chamfer1.Add(CHAMFER1_SIZE, CHAMFER1_SIZE2, e.wrapped, chamfer1_side_5[0].wrapped)  # the first distance lies on this face
    for e in chamfer1_edges_6:
        chamfer1.Add(CHAMFER1_SIZE, CHAMFER1_SIZE2, e.wrapped, chamfer1_side_6[0].wrapped)  # the first distance lies on this face
    for e in chamfer1_edges_7:
        chamfer1.Add(CHAMFER1_SIZE, CHAMFER1_SIZE2, e.wrapped, chamfer1_side_7[0].wrapped)  # the first distance lies on this face
    add(Compound.cast(chamfer1.Shape()), mode=Mode.REPLACE)


solid = part.part
